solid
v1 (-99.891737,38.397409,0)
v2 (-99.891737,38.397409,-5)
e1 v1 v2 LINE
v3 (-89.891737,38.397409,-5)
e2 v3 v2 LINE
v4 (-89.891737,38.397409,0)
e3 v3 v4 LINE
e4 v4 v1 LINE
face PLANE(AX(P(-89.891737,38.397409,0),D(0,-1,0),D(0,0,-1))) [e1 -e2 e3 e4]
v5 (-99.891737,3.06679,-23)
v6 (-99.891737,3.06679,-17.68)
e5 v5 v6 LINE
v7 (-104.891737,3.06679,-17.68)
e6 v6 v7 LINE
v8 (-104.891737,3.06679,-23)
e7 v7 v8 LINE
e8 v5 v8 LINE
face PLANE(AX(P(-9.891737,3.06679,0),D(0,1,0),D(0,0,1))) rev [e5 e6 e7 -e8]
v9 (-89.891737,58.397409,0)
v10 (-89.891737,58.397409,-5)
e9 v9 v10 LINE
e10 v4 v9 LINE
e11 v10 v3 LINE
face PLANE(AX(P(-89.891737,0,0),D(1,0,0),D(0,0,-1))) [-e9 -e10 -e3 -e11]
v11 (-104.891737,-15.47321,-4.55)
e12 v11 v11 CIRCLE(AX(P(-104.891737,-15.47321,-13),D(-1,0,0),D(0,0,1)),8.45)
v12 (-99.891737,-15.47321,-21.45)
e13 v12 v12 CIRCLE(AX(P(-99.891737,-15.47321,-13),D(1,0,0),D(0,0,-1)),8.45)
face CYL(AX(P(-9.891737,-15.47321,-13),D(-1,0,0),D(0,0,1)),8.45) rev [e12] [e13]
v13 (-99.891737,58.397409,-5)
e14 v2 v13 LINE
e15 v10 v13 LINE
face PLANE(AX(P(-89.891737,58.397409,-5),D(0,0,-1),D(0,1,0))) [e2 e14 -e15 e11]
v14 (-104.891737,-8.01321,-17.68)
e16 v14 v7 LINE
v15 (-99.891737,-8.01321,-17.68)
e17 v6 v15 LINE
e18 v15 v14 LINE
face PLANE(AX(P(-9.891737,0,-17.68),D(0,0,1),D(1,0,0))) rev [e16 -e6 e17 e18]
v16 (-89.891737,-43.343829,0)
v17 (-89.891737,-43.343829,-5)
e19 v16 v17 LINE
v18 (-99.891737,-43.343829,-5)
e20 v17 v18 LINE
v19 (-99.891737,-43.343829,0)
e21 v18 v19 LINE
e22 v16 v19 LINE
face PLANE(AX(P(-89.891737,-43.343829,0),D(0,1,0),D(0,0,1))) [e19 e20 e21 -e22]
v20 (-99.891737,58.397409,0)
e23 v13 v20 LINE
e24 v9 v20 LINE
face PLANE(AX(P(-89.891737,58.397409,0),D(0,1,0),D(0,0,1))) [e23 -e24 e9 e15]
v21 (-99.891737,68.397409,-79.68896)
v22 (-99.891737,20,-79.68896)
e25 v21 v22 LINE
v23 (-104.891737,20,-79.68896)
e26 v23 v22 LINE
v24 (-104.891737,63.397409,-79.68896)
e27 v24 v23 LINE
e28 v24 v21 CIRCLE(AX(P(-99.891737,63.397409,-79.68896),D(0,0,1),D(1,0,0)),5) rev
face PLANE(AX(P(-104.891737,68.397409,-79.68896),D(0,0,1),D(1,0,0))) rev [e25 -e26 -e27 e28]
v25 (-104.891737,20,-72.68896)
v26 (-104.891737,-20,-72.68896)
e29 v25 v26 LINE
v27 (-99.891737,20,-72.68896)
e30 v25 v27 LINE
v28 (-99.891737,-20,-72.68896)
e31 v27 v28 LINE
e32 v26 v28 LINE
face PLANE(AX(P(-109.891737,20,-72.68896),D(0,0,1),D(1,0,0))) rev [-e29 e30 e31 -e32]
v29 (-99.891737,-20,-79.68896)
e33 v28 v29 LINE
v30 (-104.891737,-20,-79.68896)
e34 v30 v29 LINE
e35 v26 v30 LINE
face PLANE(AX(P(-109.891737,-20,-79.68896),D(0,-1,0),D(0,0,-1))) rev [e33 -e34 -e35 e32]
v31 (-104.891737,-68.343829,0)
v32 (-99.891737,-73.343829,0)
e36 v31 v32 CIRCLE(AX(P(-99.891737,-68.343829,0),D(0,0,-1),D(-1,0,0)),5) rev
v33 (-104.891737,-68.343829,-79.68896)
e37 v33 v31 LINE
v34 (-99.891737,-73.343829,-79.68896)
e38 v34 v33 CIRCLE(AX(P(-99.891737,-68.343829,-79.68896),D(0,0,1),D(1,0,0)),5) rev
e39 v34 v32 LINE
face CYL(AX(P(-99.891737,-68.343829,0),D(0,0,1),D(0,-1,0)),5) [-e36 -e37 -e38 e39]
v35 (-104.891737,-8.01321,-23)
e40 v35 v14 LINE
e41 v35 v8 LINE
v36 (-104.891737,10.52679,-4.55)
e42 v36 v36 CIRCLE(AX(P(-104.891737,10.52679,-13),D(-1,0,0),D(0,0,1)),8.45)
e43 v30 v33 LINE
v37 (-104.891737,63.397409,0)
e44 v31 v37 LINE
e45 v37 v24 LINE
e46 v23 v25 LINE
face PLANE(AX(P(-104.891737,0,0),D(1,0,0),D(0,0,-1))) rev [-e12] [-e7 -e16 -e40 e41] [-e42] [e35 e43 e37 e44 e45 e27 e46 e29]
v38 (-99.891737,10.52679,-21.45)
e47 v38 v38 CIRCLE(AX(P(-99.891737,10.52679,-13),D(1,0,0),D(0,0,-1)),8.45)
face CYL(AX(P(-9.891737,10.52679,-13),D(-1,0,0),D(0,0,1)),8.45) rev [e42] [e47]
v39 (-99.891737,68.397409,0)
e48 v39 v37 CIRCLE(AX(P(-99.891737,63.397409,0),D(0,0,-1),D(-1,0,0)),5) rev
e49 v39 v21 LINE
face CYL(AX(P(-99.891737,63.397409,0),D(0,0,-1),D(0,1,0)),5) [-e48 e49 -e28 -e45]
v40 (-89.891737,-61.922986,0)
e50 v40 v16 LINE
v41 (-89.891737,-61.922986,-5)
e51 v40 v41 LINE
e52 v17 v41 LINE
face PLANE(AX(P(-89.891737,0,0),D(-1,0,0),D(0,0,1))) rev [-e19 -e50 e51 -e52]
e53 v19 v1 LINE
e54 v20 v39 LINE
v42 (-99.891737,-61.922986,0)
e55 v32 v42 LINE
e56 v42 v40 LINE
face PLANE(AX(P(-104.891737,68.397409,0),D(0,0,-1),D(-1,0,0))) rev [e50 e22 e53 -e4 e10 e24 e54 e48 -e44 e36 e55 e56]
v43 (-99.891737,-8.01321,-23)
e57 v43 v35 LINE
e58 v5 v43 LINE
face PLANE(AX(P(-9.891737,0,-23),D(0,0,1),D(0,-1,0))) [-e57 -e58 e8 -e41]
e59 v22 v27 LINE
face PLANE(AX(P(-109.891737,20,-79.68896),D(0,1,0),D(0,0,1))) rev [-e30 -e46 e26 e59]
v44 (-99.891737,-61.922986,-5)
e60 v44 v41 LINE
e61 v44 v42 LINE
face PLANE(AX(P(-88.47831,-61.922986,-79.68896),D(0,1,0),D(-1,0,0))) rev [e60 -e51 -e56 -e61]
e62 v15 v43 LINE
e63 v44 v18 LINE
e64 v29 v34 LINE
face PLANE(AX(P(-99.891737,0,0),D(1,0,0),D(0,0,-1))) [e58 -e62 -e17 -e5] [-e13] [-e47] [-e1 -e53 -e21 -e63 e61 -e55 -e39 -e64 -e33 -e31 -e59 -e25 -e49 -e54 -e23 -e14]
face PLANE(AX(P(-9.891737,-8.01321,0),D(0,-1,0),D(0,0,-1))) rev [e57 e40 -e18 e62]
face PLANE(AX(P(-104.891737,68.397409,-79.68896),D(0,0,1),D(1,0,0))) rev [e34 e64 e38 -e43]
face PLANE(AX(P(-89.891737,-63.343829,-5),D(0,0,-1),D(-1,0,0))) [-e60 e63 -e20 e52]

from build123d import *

# Parameters (mm, degrees)
CROQUIS2_W              = 200
CROQUIS2_H              = 150
CROQUIS2_R              = 2
CROQUIS2_R_2            = 2.5
CROQUIS2_W_2            = 31.297292299
CROQUIS2_H_2            = 43.768728426
CROQUIS2_H_3            = 43.768728427
CROQUIS2_W_3            = 23.573907934
CROQUIS2_H_4            = 45.323962431
SALIENTE_EXTRUIR1_DEPTH = 2
REDONDEO1_R             = 10
BOSS_EXTRUDE1_DEPTH     = 25
SKETCH3_W               = 62.040442094
SKETCH3_H               = 5.530821024
BOSS_EXTRUDE2_DEPTH     = 22
SKETCH8_W               = 62.040442094
SKETCH8_H               = 5.530821024
BOSS_EXTRUDE6_DEPTH     = 13
SKETCH2_W               = 200
SKETCH2_H               = 78.124132015
SKETCH2_W_2             = 62.040442094
SKETCH2_H_2             = 5.530821024
BOSS_EXTRUDE3_DEPTH     = 5
SKETCH4_W               = 62.040442094
SKETCH4_H               = 5.530821024
BOSS_EXTRUDE4_DEPTH     = 19
SKETCH5_W               = 7.442573222
SKETCH5_H               = 2.991451355
BOSS_EXTRUDE5_DEPTH     = 21
SKETCH6_R               = 2.5
CUT_EXTRUDE1_DEPTH      = 158.961544101
FILLET1_R               = 10
SKETCH10_W              = 79.68896036
SKETCH10_H              = 141.741238344
BOSS_EXTRUDE7_DEPTH     = 5
SKETCH11_W              = 5
SKETCH11_H              = 20
BOSS_EXTRUDE13_DEPTH    = 15
FILLET2_R               = 5
CUT_EXTRUDE3_DEPTH      = 215.07420719
SKETCH15_W              = 7
SKETCH15_H              = 40
CUT_EXTRUDE5_DEPTH      = 10
CROQUIS4_R              = 8.45
CROQUIS4_W              = 5.32
CROQUIS4_H              = 11.08
CORTAR_EXTRUIR3_DEPTH   = 95


# Read off the part's stored shape, not the designer's step: Cut-Extrude4
# Some blends are built 0.0001 mm under size
with BuildPart() as part:
    # Croquis2 → Saliente-Extruir1 (new body)
    with BuildSketch(Plane.XY):
        with Locations((0.108263467, -0.36008145)):
            Rectangle(CROQUIS2_W, CROQUIS2_H)
        with Locations((89.108263467, -66.5)):
            Circle(CROQUIS2_R, mode=Mode.SUBTRACT)
        with Locations((-88.891736533, -66.5)):
            Circle(CROQUIS2_R, mode=Mode.SUBTRACT)
        with Locations(Location((89.108263467, 65.779837101, 0), (0, 0, 180))):
            Circle(CROQUIS2_R, mode=Mode.SUBTRACT)
        with Locations(Location((-88.891736533, 65.779837101, 0), (0, 0, 180))):
            Circle(CROQUIS2_R, mode=Mode.SUBTRACT)
        with Locations((-80.865436179, -59.36008145)):
            Circle(CROQUIS2_R_2, mode=Mode.SUBTRACT)
        with Locations((81.108263467, -59.36008145)):
            Circle(CROQUIS2_R_2, mode=Mode.SUBTRACT)
        with Locations(Location((81.108263467, 58.63991855, 0), (0, 0, 180))):
            Circle(CROQUIS2_R_2, mode=Mode.SUBTRACT)
        with Locations(Location((-80.865436179, 58.63991855, 0), (0, 0, 180))):
            Circle(CROQUIS2_R_2, mode=Mode.SUBTRACT)
        with BuildLine():
            Line((-62.091736533, 70.63991855), (64.108263467, 70.63991855))
            ThreePointArc((64.108263467, 70.63991855), (66.108263467, 68.63991855), (64.108263467, 66.63991855))
            Line((64.108263467, 66.63991855), (-62.091736533, 66.63991855))
            ThreePointArc((-62.091736533, 66.63991855), (-64.091736533, 68.63991855), (-62.091736533, 70.63991855))
        make_face(mode=Mode.SUBTRACT)
        Polygon((-71.391736533, -12.902447307), (-71.391736533, 12.182284408), (-79.241736533, 12.28991855), (-83.891736533, 12.28991855), (-83.891736533, -13.01008145), (-79.241736533, -13.01008145), align=None, mode=Mode.SUBTRACT)
        with BuildLine():
            Line((92.108263467, 45.478381757), (92.108263467, -46.198544657))
            ThreePointArc((92.108263467, -46.198544657), (90.807295546, -47.897576736), (89.108263467, -46.596608814))
            Line((89.108263467, -46.596608814), (89.108263467, 45.876445915))
            ThreePointArc((89.108263467, 45.876445915), (90.807295546, 47.177413836), (92.108263467, 45.478381757))
        make_face(mode=Mode.SUBTRACT)
        Polygon((84.108263467, 12.28991855), (84.108263467, -13.01008145), (79.458263467, -13.01008145), (71.608263467, -13.01008145), (71.608263467, 12.28991855), (79.458263467, 12.28991855), align=None, mode=Mode.SUBTRACT)
        with BuildLine():
            Line((-91.891736533, 45.478381757), (-91.891736533, -46.198544657))
            ThreePointArc((-91.891736533, -46.198544657), (-90.590768612, -47.897576736), (-88.891736533, -46.596608814))
            Line((-88.891736533, -46.596608814), (-88.891736533, 45.876445915))
            ThreePointArc((-88.891736533, 45.876445915), (-90.590768612, 47.177413836), (-91.891736533, 45.478381757))
        make_face(mode=Mode.SUBTRACT)
        with Locations((-30.011405388, 36.299005811)):
            Rectangle(CROQUIS2_W_2, CROQUIS2_H_2, mode=Mode.SUBTRACT)
        with BuildLine():
            Line((-62.091736533, -71.36008145), (64.108263467, -71.36008145))
            ThreePointArc((64.108263467, -71.36008145), (66.108263467, -69.36008145), (64.108263467, -67.36008145))
            Line((64.108263467, -67.36008145), (-62.091736533, -67.36008145))
            ThreePointArc((-62.091736533, -67.36008145), (-64.091736533, -69.36008145), (-62.091736533, -71.36008145))
        make_face(mode=Mode.SUBTRACT)
        with Locations((-30.011405388, -26.799059535)):
            Rectangle(CROQUIS2_W_2, CROQUIS2_H_3, mode=Mode.SUBTRACT)
        with Locations((12.982877294, -0.693345879)):
            Rectangle(CROQUIS2_W_3, CROQUIS2_H_4, mode=Mode.SUBTRACT)
    extrude(amount=SALIENTE_EXTRUIR1_DEPTH)

    # Redondeo1
    redondeo1_edges = [part.edges().sort_by_distance(p)[0] for p in [
        (100.108263467, -75.36008145, 1),
        (-99.891736533, -75.36008145, 1),
        (-99.891736533, 74.63991855, 1),
        (100.108263467, 74.63991855, 1),
    ]]
    fillet(redondeo1_edges, radius=REDONDEO1_R)

    # Sketch1 → Boss-Extrude1 (add)
    with BuildSketch(Plane.XY.offset(2)):
        Polygon((-67.071845217, 64.63991855), (-67.071845217, 60.63991855), (-8.841198185, 60.63991855), (-8.841198185, 3.63991855), (-67.071845217, 3.63991855), (-67.071845217, -0.36008145), (-8.841198185, -0.36008145), (-8.841198185, -53.36008145), (-67.071845217, -53.36008145), (-67.071845217, -57.574734434), (-5.031403123, -57.574734434), (-5.031403123, -40.931443482), (46.608263467, -40.931443482), (46.608263467, -36.931443482), (-5.031403123, -36.931443482), (-5.031403123, 30.068556518), (46.608263467, 30.068556518), (46.608263467, 34.068556518), (-5.031403123, 34.068556518), (-5.031403123, 64.63991855), align=None)
    extrude(amount=BOSS_EXTRUDE1_DEPTH)

    # Sketch3 → Boss-Extrude2 (add)
    with BuildSketch(Plane.XZ.offset(57.574734434)):
        with Locations((-36.05162417, 24.234589488)):
            Rectangle(SKETCH3_W, SKETCH3_H)
    extrude(amount=BOSS_EXTRUDE2_DEPTH)

    # Sketch8 → Boss-Extrude6 (add)
    with BuildSketch(Plane(origin=(0, 64.63991855, 0), x_dir=(1, 0, 0), z_dir=(0, 1, 0))):
        with Locations((-36.05162417, -24.234589488)):
            Rectangle(SKETCH8_W, SKETCH8_H)
    extrude(amount=BOSS_EXTRUDE6_DEPTH)

    # Sketch2 → Boss-Extrude3 (add)
    with BuildSketch(Plane.XZ.offset(75.36008145)):
        with Locations((0.108263467, 41.062066008)):
            Rectangle(SKETCH2_W, SKETCH2_H)
        with Locations((-36.05162417, 24.234589488)):
            Rectangle(SKETCH2_W_2, SKETCH2_H_2, mode=Mode.SUBTRACT)
    extrude(amount=-BOSS_EXTRUDE3_DEPTH)

    # Sketch4 → Boss-Extrude4 (add)
    with BuildSketch(Plane(origin=(0, 64.63991855, 0), x_dir=(1, 0, 0), z_dir=(0, 1, 0))):
        with Locations((-36.05162417, -24.234589488)):
            Rectangle(SKETCH4_W, SKETCH4_H)
    extrude(amount=BOSS_EXTRUDE4_DEPTH)

    # Sketch5 → Boss-Extrude5 (add)
    with BuildSketch(Plane.XZ.offset(75.36008145)):
        with Locations((-80.540187187, 3.495725678)):
            Rectangle(SKETCH5_W, SKETCH5_H)
        with Locations((80.756714122, 3.495725678)):
            Rectangle(SKETCH5_W, SKETCH5_H)
    extrude(amount=BOSS_EXTRUDE5_DEPTH)

    # Sketch6 → Cut-Extrude1 (cut, through all)
    with BuildSketch(Plane.XY.offset(4.991451355)):
        with Locations((-80.996023003, -59.284349751)):
            Circle(SKETCH6_R)
        with Locations((81.166025964, -59.051385225)):
            Circle(SKETCH6_R)
    extrude(amount=-CUT_EXTRUDE1_DEPTH, mode=Mode.SUBTRACT)

    # Fillet1
    # the kernel refuses this fillet: 10 mm, written as the material it takes off along each edge
    with BuildSketch(Plane(origin=(100.108263467, -70.36008145, 2), x_dir=(-1, 0, 0), z_dir=(0, 0, 1)), Plane(origin=(-99.891736533, -70.36008145, 101.77476711), x_dir=(1, 0, 0), z_dir=(0, 0, -1))) as fillet1_piece_1:
        with BuildLine():
            CenterArc((8.660254038, 10), FILLET1_R, 210, 60)
            Line((0, 5), (0, 0))
            Line((0, 0), (8.660254038, 0))
        make_face()
    extrude(amount=99.77476711, mode=Mode.SUBTRACT)


with BuildPart() as body_2:
    # Sketch10 → Boss-Extrude7 (new body)
    with BuildSketch(Plane.ZY.offset(99.891736533)):
        with Locations((-39.84448018, -2.473210197)):
            Rectangle(SKETCH10_W, SKETCH10_H)
    extrude(amount=BOSS_EXTRUDE7_DEPTH)

    # Sketch11 → Boss-Extrude13 (add)
    with BuildSketch(Plane.ZY.offset(104.891736533)):
        with Locations((-2.5, -53.343829369)):
            Rectangle(SKETCH11_W, SKETCH11_H)
        with Locations((-2.5, 48.397408975)):
            Rectangle(SKETCH11_W, SKETCH11_H)
    extrude(amount=-BOSS_EXTRUDE13_DEPTH)

    # Fillet2
    fillet2_edges = [body_2.edges().sort_by_distance(p)[0] for p in [
        (-104.891736533, 68.397408975, -39.84448018),
        (-104.891736533, -73.343829369, -39.84448018),
    ]]
    fillet(fillet2_edges, radius=FILLET2_R - 0.0001)  # a hair under: the kernel refuses the full size


with BuildPart() as cut_extrude3_tool:
    # Sketch13 → Cut-Extrude3 (new, through all)
    with BuildSketch(Plane.XY.offset(80.124132015)):
        Polygon((-88.891736533, 38.397408975), (-87.891736533, 38.397408975), (-87.891736533, 63.52554782), (-99.891736533, 63.52554782), (-99.891736533, 94.010082764), (108.48763668, 94.010082764), (108.48763668, -102.123784964), (-99.891736533, -102.123784964), (-99.891736533, -61.922986139), (-88.478309969, -61.922986139), (-88.478309969, -40.956005085), (-99.891736533, -40.956005085), (-99.891736533, 38.397408975), align=None)
    extrude(amount=-CUT_EXTRUDE3_DEPTH)


with BuildPart() as part_1:
    add(part.part)

    # Cut-Extrude3: cut by cut_extrude3_tool
    add(cut_extrude3_tool.part, mode=Mode.SUBTRACT)


with BuildPart() as body_2_1:
    add(body_2.part)

    # Cut-Extrude3: cut by cut_extrude3_tool
    add(cut_extrude3_tool.part, mode=Mode.SUBTRACT)

    # Sketch15 → Cut-Extrude5 (cut)
    with BuildSketch(Plane(origin=(-99.891736533, 0, 0), x_dir=(0, 0, -1), z_dir=(1, 0, 0))):
        with Locations((76.18896036, 0)):
            Rectangle(SKETCH15_W, SKETCH15_H)
    extrude(amount=-CUT_EXTRUDE5_DEPTH, mode=Mode.SUBTRACT)

    # Croquis4 → Cortar-Extruir3 (cut)
    with BuildSketch(Plane.ZY.offset(104.891736533)):
        with Locations((-13, 10.526789803)):
            Circle(CROQUIS4_R)
        with Locations((-13, -15.473210197)):
            Circle(CROQUIS4_R)
        with Locations((-20.34, -2.473210197)):
            Rectangle(CROQUIS4_W, CROQUIS4_H)
    extrude(amount=-CORTAR_EXTRUIR3_DEPTH, mode=Mode.SUBTRACT)


solid = body_2_1.part
